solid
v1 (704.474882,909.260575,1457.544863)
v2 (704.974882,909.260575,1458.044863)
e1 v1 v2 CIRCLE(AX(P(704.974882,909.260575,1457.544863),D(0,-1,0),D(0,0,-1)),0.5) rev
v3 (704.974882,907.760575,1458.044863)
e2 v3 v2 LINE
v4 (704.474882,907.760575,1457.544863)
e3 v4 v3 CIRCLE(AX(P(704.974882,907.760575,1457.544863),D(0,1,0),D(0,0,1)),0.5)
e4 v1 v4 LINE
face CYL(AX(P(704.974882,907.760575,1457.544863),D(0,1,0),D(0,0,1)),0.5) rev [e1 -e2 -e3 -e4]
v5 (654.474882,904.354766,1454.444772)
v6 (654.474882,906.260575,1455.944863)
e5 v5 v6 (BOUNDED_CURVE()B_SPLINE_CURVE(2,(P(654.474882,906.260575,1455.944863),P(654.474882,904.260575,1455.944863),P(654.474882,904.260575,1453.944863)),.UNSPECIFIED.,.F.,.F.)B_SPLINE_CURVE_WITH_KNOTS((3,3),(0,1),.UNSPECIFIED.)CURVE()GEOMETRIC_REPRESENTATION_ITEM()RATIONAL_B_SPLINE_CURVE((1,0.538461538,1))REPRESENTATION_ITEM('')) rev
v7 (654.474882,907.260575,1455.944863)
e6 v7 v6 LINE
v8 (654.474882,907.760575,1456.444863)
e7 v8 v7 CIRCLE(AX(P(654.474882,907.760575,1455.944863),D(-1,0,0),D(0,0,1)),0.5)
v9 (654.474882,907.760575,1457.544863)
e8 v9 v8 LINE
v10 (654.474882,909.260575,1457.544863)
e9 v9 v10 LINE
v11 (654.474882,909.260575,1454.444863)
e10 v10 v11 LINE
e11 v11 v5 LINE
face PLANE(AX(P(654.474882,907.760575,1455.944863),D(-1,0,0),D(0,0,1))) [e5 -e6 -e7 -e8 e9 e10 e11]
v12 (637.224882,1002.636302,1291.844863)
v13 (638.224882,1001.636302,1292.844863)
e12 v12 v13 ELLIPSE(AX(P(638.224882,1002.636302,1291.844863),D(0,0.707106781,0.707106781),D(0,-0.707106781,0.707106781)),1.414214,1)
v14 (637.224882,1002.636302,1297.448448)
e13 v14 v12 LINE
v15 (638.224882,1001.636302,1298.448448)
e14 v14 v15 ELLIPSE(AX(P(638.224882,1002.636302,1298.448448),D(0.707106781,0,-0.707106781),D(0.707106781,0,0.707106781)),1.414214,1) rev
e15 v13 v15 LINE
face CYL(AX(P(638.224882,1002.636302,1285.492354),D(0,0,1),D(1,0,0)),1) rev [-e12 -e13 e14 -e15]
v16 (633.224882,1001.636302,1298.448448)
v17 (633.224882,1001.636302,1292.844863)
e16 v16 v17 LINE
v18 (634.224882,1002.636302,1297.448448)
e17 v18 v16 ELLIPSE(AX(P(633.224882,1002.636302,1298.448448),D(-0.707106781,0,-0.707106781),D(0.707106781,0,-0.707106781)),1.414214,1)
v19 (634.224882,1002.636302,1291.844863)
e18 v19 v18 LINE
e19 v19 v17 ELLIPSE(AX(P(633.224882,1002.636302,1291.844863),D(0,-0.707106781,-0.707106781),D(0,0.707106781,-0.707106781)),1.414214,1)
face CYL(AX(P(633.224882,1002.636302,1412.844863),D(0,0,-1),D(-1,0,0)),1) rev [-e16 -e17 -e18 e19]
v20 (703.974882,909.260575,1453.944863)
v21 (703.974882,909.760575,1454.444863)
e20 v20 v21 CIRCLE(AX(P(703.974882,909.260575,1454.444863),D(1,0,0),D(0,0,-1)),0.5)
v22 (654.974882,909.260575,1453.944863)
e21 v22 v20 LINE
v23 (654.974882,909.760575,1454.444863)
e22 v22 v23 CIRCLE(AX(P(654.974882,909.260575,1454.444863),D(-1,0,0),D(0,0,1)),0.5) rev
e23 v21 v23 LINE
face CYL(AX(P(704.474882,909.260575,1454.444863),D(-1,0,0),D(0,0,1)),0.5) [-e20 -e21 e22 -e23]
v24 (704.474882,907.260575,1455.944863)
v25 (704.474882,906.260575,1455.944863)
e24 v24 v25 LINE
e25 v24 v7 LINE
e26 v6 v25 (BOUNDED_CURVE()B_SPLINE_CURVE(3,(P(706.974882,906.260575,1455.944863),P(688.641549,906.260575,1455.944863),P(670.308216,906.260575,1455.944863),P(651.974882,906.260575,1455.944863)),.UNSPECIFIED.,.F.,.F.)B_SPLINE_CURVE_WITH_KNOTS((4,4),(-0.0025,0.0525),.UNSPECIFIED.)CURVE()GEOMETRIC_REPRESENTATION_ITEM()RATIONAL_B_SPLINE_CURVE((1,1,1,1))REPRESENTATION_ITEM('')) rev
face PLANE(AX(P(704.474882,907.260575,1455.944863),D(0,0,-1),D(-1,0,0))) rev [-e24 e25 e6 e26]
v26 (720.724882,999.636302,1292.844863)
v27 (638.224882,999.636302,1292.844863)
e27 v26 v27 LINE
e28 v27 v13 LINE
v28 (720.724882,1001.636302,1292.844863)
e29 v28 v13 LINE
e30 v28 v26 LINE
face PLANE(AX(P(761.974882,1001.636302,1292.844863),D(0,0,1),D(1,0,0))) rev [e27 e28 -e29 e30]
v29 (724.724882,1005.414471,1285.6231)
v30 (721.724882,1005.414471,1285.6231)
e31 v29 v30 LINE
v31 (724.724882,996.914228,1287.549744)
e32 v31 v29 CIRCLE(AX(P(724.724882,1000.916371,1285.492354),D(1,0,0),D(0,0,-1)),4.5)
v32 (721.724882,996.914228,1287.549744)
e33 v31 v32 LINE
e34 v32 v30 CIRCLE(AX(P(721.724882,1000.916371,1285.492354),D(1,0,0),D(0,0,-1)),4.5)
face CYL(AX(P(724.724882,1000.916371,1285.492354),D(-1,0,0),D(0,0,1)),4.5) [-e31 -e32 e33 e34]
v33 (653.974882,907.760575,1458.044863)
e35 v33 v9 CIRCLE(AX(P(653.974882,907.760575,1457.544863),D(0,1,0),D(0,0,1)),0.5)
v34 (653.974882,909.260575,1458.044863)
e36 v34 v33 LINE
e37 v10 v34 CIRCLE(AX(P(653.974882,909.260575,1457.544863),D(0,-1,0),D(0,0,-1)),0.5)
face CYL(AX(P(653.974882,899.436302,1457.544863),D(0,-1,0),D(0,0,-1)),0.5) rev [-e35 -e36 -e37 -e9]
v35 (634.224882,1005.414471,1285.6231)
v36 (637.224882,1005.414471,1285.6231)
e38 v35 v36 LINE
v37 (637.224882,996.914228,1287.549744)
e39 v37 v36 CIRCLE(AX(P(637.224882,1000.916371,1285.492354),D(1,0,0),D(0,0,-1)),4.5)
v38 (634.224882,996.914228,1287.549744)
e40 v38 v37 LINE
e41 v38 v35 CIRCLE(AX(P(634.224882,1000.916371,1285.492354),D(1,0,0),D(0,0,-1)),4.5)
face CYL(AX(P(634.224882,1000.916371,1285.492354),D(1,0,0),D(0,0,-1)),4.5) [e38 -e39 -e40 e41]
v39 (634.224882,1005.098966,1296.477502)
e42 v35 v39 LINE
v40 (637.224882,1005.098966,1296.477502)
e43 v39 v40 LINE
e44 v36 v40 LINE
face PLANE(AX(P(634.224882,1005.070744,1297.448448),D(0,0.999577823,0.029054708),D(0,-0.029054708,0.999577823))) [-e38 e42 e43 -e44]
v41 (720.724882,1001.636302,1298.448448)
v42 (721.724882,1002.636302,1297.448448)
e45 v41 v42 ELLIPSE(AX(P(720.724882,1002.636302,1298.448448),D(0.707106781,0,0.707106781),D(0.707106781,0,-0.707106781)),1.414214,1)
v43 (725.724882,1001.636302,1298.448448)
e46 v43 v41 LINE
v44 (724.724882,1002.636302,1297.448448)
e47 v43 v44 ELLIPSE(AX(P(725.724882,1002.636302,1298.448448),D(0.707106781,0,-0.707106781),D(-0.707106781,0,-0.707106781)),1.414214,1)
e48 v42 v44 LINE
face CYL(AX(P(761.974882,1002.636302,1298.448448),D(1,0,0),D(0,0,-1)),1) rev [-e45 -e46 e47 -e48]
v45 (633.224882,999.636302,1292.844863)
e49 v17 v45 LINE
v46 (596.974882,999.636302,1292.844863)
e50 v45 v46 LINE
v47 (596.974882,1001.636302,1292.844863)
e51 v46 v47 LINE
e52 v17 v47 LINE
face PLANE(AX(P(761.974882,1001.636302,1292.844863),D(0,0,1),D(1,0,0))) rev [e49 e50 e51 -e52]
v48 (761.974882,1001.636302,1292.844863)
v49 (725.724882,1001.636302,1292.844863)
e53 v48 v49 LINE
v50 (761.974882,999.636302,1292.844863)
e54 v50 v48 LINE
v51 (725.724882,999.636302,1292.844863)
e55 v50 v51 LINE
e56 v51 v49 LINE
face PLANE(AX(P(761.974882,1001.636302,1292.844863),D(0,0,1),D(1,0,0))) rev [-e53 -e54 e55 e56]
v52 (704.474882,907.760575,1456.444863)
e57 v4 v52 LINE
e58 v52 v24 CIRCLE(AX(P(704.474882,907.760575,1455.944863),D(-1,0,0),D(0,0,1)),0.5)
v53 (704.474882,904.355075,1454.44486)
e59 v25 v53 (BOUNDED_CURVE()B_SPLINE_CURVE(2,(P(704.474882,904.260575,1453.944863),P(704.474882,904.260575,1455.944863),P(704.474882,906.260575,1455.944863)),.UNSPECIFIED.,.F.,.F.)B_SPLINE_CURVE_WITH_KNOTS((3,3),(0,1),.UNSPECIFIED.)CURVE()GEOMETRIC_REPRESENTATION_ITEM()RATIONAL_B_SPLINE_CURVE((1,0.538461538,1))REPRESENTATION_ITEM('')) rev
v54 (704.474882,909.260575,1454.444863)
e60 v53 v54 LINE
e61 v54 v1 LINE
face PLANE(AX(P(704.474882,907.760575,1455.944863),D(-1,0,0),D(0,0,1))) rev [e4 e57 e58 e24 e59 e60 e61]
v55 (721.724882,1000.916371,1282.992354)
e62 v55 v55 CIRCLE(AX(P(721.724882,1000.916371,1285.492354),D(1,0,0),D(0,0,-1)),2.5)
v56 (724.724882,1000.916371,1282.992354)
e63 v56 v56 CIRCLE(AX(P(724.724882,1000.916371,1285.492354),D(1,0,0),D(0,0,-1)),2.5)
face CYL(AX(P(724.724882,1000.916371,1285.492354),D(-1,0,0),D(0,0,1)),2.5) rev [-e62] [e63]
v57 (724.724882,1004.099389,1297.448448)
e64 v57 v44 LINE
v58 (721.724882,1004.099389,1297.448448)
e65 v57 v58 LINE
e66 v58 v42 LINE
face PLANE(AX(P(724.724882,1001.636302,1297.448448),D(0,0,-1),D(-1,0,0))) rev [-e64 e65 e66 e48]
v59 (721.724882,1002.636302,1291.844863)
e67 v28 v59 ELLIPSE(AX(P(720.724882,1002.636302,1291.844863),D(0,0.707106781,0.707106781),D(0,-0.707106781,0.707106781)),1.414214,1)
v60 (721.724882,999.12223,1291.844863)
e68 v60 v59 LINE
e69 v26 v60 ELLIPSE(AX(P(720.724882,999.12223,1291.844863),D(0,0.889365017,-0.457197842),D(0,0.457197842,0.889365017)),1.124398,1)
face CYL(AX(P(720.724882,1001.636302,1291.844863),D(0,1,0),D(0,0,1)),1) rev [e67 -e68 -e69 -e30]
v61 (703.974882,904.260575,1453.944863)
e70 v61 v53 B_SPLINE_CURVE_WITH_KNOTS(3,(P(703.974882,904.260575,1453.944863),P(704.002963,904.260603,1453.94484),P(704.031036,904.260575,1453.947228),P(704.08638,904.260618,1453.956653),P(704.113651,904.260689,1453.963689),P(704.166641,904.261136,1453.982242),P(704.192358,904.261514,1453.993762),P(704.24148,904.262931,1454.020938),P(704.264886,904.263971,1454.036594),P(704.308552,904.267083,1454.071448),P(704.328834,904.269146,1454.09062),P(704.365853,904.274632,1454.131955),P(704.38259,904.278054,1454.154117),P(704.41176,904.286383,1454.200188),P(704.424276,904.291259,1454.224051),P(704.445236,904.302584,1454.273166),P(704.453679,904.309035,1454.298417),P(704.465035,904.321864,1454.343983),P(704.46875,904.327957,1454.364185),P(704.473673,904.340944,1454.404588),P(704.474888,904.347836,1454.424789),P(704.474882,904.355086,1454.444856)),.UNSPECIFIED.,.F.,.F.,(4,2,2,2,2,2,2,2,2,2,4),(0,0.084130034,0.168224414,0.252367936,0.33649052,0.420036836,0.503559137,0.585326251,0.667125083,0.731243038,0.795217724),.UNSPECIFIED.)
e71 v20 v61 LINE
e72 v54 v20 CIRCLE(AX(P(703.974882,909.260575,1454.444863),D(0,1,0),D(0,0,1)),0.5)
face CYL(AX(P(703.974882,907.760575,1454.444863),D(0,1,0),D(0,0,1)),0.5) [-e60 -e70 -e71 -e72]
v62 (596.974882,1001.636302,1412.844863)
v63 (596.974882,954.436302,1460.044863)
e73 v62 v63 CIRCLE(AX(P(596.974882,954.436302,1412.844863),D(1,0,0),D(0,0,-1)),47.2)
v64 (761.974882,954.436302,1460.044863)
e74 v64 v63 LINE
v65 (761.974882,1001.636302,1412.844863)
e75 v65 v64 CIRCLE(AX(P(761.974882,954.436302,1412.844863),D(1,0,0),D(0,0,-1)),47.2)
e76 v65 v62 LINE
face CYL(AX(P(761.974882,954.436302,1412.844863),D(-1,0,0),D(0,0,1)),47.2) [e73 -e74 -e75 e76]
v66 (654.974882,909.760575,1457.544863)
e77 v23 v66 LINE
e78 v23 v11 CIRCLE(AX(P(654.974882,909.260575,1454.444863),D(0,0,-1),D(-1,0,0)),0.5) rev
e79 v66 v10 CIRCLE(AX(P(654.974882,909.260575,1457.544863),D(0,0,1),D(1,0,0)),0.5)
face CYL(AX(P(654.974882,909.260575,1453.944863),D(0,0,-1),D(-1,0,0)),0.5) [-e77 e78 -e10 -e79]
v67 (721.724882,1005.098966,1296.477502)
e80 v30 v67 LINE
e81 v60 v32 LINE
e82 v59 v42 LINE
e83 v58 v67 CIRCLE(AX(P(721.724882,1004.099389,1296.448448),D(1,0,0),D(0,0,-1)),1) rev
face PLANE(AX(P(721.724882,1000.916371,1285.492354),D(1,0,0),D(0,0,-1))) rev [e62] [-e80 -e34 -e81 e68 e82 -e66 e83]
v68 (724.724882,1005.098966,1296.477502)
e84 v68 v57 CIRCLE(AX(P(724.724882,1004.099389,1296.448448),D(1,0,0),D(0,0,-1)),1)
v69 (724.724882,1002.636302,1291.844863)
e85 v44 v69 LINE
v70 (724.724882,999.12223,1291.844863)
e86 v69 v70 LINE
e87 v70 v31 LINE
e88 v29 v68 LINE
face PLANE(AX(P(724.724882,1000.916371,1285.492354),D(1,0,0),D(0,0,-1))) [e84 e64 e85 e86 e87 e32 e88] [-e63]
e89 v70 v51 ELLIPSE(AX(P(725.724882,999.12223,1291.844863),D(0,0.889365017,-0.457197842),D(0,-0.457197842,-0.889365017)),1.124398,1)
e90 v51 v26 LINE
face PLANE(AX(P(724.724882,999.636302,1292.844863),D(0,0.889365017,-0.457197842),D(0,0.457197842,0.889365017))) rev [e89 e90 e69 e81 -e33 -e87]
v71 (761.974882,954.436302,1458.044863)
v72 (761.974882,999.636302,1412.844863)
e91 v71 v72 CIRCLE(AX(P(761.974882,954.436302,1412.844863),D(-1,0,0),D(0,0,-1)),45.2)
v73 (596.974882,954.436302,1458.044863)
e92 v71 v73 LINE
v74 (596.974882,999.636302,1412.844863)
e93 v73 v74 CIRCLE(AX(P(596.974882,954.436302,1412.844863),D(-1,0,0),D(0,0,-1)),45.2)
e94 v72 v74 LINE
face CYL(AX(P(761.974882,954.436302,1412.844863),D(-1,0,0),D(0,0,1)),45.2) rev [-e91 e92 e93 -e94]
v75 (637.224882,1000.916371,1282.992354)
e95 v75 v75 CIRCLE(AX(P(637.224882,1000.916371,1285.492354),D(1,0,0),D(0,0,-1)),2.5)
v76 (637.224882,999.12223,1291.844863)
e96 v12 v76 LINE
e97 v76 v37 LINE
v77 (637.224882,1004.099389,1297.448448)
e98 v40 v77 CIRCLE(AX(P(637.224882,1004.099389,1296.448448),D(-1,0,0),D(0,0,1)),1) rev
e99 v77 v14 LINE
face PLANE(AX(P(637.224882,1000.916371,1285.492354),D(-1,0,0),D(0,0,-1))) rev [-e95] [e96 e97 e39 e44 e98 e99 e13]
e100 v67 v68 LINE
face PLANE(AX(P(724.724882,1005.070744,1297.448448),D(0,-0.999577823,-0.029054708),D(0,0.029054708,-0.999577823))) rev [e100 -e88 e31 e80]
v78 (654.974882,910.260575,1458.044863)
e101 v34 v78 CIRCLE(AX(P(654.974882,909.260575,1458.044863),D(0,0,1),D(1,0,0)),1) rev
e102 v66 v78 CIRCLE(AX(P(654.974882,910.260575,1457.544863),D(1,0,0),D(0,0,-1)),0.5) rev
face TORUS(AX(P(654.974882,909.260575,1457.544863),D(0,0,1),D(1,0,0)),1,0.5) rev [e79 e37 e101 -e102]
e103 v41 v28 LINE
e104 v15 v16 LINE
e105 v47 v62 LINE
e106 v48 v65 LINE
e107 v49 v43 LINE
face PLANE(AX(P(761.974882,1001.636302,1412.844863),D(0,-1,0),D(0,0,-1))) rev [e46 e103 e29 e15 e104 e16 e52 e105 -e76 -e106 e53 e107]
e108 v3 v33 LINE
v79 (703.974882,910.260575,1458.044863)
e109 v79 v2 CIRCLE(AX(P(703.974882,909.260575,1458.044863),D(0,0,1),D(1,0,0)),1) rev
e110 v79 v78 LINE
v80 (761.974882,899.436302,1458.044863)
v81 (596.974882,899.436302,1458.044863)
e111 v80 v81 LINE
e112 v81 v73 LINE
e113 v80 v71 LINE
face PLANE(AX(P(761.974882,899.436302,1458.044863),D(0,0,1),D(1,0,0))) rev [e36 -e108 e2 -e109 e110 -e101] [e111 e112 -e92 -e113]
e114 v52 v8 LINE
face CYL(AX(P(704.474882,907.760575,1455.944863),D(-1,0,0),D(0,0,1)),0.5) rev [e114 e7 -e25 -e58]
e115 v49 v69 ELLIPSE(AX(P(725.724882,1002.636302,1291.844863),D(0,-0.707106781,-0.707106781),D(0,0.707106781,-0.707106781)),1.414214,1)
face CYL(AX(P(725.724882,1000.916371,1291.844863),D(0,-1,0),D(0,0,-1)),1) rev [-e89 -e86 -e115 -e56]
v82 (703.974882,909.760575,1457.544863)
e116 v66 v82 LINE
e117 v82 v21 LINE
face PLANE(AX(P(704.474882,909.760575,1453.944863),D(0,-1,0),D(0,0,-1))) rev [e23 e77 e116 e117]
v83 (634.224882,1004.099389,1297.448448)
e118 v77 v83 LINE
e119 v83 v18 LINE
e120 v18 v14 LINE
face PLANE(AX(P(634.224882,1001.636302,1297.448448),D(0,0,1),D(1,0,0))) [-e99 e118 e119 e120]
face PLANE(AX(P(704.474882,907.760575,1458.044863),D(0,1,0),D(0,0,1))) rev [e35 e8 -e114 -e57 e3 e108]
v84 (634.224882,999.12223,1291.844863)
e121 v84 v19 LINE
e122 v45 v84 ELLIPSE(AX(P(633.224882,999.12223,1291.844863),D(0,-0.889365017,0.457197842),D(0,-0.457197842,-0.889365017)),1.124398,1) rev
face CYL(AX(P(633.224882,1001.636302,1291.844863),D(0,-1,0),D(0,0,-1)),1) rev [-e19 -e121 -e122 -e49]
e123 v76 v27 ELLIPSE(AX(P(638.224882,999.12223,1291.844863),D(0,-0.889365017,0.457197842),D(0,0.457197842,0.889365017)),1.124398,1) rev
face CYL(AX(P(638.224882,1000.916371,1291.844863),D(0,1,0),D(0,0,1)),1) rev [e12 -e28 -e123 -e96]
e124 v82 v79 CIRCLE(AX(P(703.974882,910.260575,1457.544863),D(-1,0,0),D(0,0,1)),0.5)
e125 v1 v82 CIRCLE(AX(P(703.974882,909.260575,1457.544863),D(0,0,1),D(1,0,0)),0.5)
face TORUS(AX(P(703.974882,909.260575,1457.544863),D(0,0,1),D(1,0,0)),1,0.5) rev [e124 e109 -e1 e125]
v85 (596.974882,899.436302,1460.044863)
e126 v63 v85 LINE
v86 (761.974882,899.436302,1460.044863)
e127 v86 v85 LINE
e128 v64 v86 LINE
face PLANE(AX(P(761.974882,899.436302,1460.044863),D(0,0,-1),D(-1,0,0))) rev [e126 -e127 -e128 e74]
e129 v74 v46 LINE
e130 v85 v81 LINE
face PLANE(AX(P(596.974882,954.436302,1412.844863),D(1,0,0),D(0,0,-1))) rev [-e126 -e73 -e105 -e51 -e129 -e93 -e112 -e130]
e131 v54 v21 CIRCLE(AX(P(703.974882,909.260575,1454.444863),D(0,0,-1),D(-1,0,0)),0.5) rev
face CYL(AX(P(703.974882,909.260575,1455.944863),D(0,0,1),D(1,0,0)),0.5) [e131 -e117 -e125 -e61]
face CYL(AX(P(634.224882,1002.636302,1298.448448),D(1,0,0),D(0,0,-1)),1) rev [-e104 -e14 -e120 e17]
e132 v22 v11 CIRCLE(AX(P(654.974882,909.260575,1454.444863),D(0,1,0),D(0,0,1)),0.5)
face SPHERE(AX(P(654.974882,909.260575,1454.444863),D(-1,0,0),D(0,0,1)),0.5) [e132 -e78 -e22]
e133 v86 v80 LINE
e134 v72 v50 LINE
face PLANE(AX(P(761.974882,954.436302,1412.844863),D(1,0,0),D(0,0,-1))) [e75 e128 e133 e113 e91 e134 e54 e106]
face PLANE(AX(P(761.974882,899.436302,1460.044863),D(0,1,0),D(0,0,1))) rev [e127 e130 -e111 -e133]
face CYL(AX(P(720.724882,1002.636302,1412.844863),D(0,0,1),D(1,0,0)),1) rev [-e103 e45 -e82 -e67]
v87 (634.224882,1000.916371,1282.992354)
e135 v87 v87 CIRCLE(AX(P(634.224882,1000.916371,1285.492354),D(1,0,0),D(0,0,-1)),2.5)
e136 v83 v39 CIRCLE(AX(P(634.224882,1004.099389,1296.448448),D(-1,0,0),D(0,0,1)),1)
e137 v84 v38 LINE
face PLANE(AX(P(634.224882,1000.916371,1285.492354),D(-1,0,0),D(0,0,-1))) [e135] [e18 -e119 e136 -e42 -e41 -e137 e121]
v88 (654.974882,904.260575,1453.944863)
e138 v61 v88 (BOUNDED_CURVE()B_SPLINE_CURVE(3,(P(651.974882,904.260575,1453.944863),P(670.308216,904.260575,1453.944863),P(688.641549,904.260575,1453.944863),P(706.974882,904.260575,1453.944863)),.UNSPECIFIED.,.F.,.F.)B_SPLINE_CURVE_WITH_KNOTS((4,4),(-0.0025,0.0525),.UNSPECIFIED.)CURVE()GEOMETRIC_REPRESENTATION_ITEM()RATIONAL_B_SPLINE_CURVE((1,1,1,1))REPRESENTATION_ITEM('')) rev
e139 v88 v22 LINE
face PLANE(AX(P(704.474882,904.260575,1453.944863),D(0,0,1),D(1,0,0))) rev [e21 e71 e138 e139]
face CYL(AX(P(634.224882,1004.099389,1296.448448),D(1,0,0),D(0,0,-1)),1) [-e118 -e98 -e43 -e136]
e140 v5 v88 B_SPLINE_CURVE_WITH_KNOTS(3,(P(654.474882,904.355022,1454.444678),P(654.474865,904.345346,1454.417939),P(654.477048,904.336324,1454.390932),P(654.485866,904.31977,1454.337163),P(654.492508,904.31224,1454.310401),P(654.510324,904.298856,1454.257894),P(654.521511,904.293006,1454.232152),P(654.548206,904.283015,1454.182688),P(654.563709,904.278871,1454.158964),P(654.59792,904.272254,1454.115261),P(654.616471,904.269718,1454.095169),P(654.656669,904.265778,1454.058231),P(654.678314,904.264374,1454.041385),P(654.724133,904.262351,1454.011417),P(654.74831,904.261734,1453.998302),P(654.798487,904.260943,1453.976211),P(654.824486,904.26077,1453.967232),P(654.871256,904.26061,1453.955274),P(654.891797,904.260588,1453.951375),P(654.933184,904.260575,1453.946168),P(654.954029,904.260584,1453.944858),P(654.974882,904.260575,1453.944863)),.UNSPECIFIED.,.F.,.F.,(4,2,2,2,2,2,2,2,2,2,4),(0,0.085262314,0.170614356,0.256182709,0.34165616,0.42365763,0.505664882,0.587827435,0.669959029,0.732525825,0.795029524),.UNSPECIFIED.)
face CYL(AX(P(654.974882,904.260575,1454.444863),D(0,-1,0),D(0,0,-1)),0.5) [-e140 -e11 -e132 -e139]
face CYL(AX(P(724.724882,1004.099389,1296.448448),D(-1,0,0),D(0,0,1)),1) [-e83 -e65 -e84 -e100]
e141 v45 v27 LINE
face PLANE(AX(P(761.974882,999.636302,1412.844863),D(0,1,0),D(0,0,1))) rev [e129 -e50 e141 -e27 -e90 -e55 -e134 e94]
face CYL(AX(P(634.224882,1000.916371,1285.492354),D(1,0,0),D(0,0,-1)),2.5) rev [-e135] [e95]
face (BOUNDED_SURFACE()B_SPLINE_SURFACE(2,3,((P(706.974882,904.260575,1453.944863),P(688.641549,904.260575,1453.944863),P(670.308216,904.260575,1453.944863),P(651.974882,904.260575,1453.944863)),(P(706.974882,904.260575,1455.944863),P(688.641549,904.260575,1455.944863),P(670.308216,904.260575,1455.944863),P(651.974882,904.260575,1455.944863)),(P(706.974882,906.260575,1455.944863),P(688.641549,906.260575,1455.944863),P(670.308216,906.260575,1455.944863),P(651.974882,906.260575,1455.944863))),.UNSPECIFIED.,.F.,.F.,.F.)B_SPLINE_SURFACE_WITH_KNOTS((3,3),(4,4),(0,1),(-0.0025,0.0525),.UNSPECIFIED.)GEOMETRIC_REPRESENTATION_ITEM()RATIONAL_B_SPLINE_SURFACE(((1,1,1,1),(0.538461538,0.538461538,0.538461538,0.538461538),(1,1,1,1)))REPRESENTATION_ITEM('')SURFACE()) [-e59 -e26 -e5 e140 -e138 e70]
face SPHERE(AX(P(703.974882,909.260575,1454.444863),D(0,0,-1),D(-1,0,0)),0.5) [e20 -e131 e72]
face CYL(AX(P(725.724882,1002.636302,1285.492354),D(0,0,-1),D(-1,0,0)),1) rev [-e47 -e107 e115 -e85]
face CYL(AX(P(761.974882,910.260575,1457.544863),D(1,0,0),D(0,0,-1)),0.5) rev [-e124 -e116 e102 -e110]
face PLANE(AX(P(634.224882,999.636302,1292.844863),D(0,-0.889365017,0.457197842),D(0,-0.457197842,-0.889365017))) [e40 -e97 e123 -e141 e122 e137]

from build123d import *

# Parameters (mm, degrees)
BOSS_EXTRUDE1_DEPTH  = 82.5
SKETCH2_R            = 2.5
BOSS_EXTRUDE2_DEPTH  = 3
FILLET1_R            = 1
FILLET1_OF_MIRROR1_R = 1
BOSS_EXTRUDE3_DEPTH  = 25
FILLET2_SIZE         = 2
FILLET3_R            = 0.5


with BuildPart() as part:
    # Sketch1 → Boss-Extrude1 (new, symmetric)
    with BuildSketch(Plane(origin=(679.474882377, 899.436301878, 1292.844863494), x_dir=(0, 0, -1), z_dir=(1, 0, 0))):
        with BuildLine():
            Line((-167.2, 0), (-167.2, 55))
            ThreePointArc((-167.2, 55), (-153.375440072, 88.375440072), (-120, 102.2))
            Line((-120, 102.2), (0, 102.2))
            Line((0, 102.2), (0, 100.2))
            Line((0, 100.2), (-120, 100.2))
            ThreePointArc((-120, 100.2), (-151.96122651, 86.96122651), (-165.2, 55))
            Line((-165.2, 55), (-165.2, 0))
            Line((-165.2, 0), (-167.2, 0))
        make_face()
    extrude(amount=BOSS_EXTRUDE1_DEPTH, both=True)

    # Sketch2 → Boss-Extrude2 (add)
    with BuildSketch(Plane(origin=(721.724882377, 0, 0), x_dir=(0, 0, -1), z_dir=(1, 0, 0))):
        with BuildLine():
            Line((-1292.844863494, 999.636301878), (-1287.549744281, 996.914228228))
            ThreePointArc((-1287.549744281, 996.914228228), (-1281.103673423, 999.921643269), (-1285.623100176, 1005.414471007))
            Line((-1285.623100176, 1005.414471007), (-1297.448447634, 1005.070743882))
            Line((-1297.448447634, 1005.070743882), (-1297.448447634, 1001.636301878))
            Line((-1297.448447634, 1001.636301878), (-1292.844863494, 1001.636301878))
            Line((-1292.844863494, 1001.636301878), (-1292.844863494, 999.636301878))
        make_face()
        with Locations((-1285.492353992, 1000.916370804)):
            Circle(SKETCH2_R, mode=Mode.SUBTRACT)
    boss_extrude2 = extrude(amount=BOSS_EXTRUDE2_DEPTH)

    # Fillet1
    fillet1_edges = [part.edges().sort_by_distance(p)[0] for p in [
        (724.724882377, 1000.636301878, 1292.844863494),
        (724.724882377, 1001.636301878, 1295.146655564),
        (721.724882377, 1000.636301878, 1292.844863494),
        (723.224882377, 1005.070743882, 1297.448447634),
        (721.724882377, 1001.636301878, 1295.146655564),
        (723.224882377, 1001.636301878, 1297.448447634),
    ]]
    fillet(fillet1_edges, radius=FILLET1_R)

    # Mirror1: Boss-Extrude2 across plane
    add(boss_extrude2.mirror(Plane(origin=(679.474882377, 0, 0), x_dir=(0, 0, 1), z_dir=(1, 0, 0))))

    # Fillet1 of Mirror1
    fillet1_of_mirror1_edges = [part.edges().sort_by_distance(p)[0] for p in [
        (634.224882377, 1000.636301878, 1292.844863494),
        (634.224882377, 1001.636301878, 1295.146655564),
        (637.224882377, 1000.636301878, 1292.844863494),
        (635.724882377, 1005.070743882, 1297.448447634),
        (637.224882377, 1001.636301878, 1295.146655564),
        (635.724882377, 1001.636301878, 1297.448447634),
    ]]
    fillet(fillet1_of_mirror1_edges, radius=FILLET1_OF_MIRROR1_R)

    # Sketch3 → Boss-Extrude3 (add, symmetric)
    with BuildSketch(Plane(origin=(679.474882377, 0, 0), x_dir=(0, 0, -1), z_dir=(1, 0, 0))):
        with BuildLine():
            Line((-1458.044863494, 907.760575274), (-1456.444863494, 907.760575274))
            ThreePointArc((-1456.444863494, 907.760575274), (-1455.591310103, 908.114128665), (-1455.944863494, 907.260575274))
            Line((-1455.944863494, 907.260575274), (-1455.944863494, 904.260575274))
            Line((-1455.944863494, 904.260575274), (-1453.944863494, 904.260575274))
            Line((-1453.944863494, 904.260575274), (-1453.944863494, 909.760575274))
            Line((-1453.944863494, 909.760575274), (-1458.044863494, 909.760575274))
            Line((-1458.044863494, 909.760575274), (-1458.044863494, 907.760575274))
        make_face()
    extrude(amount=BOSS_EXTRUDE3_DEPTH, both=True)

    # Fillet2
    # a fillet whose section is not a circle: 2 mm, written as the material it takes off along each edge
    with BuildSketch(Plane(origin=(649.474882377, 904.260575274, 1455.944863494), x_dir=(0, 1, 0), z_dir=(1, 0, 0))) as fillet2_piece_1:
        with BuildLine():
            Bezier((FILLET2_SIZE, 0), (0, 0), (0, -FILLET2_SIZE), weights=[1, 0.538461538, 1])
            Line((0, -FILLET2_SIZE), (0, 0))
            Line((0, 0), (FILLET2_SIZE, 0))
        make_face()
    extrude(amount=60, mode=Mode.SUBTRACT)

    # Fillet3
    fillet3_edges = [part.edges().sort_by_distance(p)[0] for p in [
        (654.474882377, 907.010575274, 1453.944863494),
        (654.474882377, 909.760575274, 1455.994863494),
        (654.474882377, 908.760575274, 1458.044863494),
        (704.474882377, 908.760575274, 1458.044863494),
        (704.474882377, 909.760575274, 1455.994863494),
        (704.474882377, 907.010575274, 1453.944863494),
        (679.474882377, 909.760575274, 1458.044863494),
        (679.474882377, 909.760575274, 1453.944863494),
    ]]
    fillet(fillet3_edges, radius=FILLET3_R)


solid = part.part
